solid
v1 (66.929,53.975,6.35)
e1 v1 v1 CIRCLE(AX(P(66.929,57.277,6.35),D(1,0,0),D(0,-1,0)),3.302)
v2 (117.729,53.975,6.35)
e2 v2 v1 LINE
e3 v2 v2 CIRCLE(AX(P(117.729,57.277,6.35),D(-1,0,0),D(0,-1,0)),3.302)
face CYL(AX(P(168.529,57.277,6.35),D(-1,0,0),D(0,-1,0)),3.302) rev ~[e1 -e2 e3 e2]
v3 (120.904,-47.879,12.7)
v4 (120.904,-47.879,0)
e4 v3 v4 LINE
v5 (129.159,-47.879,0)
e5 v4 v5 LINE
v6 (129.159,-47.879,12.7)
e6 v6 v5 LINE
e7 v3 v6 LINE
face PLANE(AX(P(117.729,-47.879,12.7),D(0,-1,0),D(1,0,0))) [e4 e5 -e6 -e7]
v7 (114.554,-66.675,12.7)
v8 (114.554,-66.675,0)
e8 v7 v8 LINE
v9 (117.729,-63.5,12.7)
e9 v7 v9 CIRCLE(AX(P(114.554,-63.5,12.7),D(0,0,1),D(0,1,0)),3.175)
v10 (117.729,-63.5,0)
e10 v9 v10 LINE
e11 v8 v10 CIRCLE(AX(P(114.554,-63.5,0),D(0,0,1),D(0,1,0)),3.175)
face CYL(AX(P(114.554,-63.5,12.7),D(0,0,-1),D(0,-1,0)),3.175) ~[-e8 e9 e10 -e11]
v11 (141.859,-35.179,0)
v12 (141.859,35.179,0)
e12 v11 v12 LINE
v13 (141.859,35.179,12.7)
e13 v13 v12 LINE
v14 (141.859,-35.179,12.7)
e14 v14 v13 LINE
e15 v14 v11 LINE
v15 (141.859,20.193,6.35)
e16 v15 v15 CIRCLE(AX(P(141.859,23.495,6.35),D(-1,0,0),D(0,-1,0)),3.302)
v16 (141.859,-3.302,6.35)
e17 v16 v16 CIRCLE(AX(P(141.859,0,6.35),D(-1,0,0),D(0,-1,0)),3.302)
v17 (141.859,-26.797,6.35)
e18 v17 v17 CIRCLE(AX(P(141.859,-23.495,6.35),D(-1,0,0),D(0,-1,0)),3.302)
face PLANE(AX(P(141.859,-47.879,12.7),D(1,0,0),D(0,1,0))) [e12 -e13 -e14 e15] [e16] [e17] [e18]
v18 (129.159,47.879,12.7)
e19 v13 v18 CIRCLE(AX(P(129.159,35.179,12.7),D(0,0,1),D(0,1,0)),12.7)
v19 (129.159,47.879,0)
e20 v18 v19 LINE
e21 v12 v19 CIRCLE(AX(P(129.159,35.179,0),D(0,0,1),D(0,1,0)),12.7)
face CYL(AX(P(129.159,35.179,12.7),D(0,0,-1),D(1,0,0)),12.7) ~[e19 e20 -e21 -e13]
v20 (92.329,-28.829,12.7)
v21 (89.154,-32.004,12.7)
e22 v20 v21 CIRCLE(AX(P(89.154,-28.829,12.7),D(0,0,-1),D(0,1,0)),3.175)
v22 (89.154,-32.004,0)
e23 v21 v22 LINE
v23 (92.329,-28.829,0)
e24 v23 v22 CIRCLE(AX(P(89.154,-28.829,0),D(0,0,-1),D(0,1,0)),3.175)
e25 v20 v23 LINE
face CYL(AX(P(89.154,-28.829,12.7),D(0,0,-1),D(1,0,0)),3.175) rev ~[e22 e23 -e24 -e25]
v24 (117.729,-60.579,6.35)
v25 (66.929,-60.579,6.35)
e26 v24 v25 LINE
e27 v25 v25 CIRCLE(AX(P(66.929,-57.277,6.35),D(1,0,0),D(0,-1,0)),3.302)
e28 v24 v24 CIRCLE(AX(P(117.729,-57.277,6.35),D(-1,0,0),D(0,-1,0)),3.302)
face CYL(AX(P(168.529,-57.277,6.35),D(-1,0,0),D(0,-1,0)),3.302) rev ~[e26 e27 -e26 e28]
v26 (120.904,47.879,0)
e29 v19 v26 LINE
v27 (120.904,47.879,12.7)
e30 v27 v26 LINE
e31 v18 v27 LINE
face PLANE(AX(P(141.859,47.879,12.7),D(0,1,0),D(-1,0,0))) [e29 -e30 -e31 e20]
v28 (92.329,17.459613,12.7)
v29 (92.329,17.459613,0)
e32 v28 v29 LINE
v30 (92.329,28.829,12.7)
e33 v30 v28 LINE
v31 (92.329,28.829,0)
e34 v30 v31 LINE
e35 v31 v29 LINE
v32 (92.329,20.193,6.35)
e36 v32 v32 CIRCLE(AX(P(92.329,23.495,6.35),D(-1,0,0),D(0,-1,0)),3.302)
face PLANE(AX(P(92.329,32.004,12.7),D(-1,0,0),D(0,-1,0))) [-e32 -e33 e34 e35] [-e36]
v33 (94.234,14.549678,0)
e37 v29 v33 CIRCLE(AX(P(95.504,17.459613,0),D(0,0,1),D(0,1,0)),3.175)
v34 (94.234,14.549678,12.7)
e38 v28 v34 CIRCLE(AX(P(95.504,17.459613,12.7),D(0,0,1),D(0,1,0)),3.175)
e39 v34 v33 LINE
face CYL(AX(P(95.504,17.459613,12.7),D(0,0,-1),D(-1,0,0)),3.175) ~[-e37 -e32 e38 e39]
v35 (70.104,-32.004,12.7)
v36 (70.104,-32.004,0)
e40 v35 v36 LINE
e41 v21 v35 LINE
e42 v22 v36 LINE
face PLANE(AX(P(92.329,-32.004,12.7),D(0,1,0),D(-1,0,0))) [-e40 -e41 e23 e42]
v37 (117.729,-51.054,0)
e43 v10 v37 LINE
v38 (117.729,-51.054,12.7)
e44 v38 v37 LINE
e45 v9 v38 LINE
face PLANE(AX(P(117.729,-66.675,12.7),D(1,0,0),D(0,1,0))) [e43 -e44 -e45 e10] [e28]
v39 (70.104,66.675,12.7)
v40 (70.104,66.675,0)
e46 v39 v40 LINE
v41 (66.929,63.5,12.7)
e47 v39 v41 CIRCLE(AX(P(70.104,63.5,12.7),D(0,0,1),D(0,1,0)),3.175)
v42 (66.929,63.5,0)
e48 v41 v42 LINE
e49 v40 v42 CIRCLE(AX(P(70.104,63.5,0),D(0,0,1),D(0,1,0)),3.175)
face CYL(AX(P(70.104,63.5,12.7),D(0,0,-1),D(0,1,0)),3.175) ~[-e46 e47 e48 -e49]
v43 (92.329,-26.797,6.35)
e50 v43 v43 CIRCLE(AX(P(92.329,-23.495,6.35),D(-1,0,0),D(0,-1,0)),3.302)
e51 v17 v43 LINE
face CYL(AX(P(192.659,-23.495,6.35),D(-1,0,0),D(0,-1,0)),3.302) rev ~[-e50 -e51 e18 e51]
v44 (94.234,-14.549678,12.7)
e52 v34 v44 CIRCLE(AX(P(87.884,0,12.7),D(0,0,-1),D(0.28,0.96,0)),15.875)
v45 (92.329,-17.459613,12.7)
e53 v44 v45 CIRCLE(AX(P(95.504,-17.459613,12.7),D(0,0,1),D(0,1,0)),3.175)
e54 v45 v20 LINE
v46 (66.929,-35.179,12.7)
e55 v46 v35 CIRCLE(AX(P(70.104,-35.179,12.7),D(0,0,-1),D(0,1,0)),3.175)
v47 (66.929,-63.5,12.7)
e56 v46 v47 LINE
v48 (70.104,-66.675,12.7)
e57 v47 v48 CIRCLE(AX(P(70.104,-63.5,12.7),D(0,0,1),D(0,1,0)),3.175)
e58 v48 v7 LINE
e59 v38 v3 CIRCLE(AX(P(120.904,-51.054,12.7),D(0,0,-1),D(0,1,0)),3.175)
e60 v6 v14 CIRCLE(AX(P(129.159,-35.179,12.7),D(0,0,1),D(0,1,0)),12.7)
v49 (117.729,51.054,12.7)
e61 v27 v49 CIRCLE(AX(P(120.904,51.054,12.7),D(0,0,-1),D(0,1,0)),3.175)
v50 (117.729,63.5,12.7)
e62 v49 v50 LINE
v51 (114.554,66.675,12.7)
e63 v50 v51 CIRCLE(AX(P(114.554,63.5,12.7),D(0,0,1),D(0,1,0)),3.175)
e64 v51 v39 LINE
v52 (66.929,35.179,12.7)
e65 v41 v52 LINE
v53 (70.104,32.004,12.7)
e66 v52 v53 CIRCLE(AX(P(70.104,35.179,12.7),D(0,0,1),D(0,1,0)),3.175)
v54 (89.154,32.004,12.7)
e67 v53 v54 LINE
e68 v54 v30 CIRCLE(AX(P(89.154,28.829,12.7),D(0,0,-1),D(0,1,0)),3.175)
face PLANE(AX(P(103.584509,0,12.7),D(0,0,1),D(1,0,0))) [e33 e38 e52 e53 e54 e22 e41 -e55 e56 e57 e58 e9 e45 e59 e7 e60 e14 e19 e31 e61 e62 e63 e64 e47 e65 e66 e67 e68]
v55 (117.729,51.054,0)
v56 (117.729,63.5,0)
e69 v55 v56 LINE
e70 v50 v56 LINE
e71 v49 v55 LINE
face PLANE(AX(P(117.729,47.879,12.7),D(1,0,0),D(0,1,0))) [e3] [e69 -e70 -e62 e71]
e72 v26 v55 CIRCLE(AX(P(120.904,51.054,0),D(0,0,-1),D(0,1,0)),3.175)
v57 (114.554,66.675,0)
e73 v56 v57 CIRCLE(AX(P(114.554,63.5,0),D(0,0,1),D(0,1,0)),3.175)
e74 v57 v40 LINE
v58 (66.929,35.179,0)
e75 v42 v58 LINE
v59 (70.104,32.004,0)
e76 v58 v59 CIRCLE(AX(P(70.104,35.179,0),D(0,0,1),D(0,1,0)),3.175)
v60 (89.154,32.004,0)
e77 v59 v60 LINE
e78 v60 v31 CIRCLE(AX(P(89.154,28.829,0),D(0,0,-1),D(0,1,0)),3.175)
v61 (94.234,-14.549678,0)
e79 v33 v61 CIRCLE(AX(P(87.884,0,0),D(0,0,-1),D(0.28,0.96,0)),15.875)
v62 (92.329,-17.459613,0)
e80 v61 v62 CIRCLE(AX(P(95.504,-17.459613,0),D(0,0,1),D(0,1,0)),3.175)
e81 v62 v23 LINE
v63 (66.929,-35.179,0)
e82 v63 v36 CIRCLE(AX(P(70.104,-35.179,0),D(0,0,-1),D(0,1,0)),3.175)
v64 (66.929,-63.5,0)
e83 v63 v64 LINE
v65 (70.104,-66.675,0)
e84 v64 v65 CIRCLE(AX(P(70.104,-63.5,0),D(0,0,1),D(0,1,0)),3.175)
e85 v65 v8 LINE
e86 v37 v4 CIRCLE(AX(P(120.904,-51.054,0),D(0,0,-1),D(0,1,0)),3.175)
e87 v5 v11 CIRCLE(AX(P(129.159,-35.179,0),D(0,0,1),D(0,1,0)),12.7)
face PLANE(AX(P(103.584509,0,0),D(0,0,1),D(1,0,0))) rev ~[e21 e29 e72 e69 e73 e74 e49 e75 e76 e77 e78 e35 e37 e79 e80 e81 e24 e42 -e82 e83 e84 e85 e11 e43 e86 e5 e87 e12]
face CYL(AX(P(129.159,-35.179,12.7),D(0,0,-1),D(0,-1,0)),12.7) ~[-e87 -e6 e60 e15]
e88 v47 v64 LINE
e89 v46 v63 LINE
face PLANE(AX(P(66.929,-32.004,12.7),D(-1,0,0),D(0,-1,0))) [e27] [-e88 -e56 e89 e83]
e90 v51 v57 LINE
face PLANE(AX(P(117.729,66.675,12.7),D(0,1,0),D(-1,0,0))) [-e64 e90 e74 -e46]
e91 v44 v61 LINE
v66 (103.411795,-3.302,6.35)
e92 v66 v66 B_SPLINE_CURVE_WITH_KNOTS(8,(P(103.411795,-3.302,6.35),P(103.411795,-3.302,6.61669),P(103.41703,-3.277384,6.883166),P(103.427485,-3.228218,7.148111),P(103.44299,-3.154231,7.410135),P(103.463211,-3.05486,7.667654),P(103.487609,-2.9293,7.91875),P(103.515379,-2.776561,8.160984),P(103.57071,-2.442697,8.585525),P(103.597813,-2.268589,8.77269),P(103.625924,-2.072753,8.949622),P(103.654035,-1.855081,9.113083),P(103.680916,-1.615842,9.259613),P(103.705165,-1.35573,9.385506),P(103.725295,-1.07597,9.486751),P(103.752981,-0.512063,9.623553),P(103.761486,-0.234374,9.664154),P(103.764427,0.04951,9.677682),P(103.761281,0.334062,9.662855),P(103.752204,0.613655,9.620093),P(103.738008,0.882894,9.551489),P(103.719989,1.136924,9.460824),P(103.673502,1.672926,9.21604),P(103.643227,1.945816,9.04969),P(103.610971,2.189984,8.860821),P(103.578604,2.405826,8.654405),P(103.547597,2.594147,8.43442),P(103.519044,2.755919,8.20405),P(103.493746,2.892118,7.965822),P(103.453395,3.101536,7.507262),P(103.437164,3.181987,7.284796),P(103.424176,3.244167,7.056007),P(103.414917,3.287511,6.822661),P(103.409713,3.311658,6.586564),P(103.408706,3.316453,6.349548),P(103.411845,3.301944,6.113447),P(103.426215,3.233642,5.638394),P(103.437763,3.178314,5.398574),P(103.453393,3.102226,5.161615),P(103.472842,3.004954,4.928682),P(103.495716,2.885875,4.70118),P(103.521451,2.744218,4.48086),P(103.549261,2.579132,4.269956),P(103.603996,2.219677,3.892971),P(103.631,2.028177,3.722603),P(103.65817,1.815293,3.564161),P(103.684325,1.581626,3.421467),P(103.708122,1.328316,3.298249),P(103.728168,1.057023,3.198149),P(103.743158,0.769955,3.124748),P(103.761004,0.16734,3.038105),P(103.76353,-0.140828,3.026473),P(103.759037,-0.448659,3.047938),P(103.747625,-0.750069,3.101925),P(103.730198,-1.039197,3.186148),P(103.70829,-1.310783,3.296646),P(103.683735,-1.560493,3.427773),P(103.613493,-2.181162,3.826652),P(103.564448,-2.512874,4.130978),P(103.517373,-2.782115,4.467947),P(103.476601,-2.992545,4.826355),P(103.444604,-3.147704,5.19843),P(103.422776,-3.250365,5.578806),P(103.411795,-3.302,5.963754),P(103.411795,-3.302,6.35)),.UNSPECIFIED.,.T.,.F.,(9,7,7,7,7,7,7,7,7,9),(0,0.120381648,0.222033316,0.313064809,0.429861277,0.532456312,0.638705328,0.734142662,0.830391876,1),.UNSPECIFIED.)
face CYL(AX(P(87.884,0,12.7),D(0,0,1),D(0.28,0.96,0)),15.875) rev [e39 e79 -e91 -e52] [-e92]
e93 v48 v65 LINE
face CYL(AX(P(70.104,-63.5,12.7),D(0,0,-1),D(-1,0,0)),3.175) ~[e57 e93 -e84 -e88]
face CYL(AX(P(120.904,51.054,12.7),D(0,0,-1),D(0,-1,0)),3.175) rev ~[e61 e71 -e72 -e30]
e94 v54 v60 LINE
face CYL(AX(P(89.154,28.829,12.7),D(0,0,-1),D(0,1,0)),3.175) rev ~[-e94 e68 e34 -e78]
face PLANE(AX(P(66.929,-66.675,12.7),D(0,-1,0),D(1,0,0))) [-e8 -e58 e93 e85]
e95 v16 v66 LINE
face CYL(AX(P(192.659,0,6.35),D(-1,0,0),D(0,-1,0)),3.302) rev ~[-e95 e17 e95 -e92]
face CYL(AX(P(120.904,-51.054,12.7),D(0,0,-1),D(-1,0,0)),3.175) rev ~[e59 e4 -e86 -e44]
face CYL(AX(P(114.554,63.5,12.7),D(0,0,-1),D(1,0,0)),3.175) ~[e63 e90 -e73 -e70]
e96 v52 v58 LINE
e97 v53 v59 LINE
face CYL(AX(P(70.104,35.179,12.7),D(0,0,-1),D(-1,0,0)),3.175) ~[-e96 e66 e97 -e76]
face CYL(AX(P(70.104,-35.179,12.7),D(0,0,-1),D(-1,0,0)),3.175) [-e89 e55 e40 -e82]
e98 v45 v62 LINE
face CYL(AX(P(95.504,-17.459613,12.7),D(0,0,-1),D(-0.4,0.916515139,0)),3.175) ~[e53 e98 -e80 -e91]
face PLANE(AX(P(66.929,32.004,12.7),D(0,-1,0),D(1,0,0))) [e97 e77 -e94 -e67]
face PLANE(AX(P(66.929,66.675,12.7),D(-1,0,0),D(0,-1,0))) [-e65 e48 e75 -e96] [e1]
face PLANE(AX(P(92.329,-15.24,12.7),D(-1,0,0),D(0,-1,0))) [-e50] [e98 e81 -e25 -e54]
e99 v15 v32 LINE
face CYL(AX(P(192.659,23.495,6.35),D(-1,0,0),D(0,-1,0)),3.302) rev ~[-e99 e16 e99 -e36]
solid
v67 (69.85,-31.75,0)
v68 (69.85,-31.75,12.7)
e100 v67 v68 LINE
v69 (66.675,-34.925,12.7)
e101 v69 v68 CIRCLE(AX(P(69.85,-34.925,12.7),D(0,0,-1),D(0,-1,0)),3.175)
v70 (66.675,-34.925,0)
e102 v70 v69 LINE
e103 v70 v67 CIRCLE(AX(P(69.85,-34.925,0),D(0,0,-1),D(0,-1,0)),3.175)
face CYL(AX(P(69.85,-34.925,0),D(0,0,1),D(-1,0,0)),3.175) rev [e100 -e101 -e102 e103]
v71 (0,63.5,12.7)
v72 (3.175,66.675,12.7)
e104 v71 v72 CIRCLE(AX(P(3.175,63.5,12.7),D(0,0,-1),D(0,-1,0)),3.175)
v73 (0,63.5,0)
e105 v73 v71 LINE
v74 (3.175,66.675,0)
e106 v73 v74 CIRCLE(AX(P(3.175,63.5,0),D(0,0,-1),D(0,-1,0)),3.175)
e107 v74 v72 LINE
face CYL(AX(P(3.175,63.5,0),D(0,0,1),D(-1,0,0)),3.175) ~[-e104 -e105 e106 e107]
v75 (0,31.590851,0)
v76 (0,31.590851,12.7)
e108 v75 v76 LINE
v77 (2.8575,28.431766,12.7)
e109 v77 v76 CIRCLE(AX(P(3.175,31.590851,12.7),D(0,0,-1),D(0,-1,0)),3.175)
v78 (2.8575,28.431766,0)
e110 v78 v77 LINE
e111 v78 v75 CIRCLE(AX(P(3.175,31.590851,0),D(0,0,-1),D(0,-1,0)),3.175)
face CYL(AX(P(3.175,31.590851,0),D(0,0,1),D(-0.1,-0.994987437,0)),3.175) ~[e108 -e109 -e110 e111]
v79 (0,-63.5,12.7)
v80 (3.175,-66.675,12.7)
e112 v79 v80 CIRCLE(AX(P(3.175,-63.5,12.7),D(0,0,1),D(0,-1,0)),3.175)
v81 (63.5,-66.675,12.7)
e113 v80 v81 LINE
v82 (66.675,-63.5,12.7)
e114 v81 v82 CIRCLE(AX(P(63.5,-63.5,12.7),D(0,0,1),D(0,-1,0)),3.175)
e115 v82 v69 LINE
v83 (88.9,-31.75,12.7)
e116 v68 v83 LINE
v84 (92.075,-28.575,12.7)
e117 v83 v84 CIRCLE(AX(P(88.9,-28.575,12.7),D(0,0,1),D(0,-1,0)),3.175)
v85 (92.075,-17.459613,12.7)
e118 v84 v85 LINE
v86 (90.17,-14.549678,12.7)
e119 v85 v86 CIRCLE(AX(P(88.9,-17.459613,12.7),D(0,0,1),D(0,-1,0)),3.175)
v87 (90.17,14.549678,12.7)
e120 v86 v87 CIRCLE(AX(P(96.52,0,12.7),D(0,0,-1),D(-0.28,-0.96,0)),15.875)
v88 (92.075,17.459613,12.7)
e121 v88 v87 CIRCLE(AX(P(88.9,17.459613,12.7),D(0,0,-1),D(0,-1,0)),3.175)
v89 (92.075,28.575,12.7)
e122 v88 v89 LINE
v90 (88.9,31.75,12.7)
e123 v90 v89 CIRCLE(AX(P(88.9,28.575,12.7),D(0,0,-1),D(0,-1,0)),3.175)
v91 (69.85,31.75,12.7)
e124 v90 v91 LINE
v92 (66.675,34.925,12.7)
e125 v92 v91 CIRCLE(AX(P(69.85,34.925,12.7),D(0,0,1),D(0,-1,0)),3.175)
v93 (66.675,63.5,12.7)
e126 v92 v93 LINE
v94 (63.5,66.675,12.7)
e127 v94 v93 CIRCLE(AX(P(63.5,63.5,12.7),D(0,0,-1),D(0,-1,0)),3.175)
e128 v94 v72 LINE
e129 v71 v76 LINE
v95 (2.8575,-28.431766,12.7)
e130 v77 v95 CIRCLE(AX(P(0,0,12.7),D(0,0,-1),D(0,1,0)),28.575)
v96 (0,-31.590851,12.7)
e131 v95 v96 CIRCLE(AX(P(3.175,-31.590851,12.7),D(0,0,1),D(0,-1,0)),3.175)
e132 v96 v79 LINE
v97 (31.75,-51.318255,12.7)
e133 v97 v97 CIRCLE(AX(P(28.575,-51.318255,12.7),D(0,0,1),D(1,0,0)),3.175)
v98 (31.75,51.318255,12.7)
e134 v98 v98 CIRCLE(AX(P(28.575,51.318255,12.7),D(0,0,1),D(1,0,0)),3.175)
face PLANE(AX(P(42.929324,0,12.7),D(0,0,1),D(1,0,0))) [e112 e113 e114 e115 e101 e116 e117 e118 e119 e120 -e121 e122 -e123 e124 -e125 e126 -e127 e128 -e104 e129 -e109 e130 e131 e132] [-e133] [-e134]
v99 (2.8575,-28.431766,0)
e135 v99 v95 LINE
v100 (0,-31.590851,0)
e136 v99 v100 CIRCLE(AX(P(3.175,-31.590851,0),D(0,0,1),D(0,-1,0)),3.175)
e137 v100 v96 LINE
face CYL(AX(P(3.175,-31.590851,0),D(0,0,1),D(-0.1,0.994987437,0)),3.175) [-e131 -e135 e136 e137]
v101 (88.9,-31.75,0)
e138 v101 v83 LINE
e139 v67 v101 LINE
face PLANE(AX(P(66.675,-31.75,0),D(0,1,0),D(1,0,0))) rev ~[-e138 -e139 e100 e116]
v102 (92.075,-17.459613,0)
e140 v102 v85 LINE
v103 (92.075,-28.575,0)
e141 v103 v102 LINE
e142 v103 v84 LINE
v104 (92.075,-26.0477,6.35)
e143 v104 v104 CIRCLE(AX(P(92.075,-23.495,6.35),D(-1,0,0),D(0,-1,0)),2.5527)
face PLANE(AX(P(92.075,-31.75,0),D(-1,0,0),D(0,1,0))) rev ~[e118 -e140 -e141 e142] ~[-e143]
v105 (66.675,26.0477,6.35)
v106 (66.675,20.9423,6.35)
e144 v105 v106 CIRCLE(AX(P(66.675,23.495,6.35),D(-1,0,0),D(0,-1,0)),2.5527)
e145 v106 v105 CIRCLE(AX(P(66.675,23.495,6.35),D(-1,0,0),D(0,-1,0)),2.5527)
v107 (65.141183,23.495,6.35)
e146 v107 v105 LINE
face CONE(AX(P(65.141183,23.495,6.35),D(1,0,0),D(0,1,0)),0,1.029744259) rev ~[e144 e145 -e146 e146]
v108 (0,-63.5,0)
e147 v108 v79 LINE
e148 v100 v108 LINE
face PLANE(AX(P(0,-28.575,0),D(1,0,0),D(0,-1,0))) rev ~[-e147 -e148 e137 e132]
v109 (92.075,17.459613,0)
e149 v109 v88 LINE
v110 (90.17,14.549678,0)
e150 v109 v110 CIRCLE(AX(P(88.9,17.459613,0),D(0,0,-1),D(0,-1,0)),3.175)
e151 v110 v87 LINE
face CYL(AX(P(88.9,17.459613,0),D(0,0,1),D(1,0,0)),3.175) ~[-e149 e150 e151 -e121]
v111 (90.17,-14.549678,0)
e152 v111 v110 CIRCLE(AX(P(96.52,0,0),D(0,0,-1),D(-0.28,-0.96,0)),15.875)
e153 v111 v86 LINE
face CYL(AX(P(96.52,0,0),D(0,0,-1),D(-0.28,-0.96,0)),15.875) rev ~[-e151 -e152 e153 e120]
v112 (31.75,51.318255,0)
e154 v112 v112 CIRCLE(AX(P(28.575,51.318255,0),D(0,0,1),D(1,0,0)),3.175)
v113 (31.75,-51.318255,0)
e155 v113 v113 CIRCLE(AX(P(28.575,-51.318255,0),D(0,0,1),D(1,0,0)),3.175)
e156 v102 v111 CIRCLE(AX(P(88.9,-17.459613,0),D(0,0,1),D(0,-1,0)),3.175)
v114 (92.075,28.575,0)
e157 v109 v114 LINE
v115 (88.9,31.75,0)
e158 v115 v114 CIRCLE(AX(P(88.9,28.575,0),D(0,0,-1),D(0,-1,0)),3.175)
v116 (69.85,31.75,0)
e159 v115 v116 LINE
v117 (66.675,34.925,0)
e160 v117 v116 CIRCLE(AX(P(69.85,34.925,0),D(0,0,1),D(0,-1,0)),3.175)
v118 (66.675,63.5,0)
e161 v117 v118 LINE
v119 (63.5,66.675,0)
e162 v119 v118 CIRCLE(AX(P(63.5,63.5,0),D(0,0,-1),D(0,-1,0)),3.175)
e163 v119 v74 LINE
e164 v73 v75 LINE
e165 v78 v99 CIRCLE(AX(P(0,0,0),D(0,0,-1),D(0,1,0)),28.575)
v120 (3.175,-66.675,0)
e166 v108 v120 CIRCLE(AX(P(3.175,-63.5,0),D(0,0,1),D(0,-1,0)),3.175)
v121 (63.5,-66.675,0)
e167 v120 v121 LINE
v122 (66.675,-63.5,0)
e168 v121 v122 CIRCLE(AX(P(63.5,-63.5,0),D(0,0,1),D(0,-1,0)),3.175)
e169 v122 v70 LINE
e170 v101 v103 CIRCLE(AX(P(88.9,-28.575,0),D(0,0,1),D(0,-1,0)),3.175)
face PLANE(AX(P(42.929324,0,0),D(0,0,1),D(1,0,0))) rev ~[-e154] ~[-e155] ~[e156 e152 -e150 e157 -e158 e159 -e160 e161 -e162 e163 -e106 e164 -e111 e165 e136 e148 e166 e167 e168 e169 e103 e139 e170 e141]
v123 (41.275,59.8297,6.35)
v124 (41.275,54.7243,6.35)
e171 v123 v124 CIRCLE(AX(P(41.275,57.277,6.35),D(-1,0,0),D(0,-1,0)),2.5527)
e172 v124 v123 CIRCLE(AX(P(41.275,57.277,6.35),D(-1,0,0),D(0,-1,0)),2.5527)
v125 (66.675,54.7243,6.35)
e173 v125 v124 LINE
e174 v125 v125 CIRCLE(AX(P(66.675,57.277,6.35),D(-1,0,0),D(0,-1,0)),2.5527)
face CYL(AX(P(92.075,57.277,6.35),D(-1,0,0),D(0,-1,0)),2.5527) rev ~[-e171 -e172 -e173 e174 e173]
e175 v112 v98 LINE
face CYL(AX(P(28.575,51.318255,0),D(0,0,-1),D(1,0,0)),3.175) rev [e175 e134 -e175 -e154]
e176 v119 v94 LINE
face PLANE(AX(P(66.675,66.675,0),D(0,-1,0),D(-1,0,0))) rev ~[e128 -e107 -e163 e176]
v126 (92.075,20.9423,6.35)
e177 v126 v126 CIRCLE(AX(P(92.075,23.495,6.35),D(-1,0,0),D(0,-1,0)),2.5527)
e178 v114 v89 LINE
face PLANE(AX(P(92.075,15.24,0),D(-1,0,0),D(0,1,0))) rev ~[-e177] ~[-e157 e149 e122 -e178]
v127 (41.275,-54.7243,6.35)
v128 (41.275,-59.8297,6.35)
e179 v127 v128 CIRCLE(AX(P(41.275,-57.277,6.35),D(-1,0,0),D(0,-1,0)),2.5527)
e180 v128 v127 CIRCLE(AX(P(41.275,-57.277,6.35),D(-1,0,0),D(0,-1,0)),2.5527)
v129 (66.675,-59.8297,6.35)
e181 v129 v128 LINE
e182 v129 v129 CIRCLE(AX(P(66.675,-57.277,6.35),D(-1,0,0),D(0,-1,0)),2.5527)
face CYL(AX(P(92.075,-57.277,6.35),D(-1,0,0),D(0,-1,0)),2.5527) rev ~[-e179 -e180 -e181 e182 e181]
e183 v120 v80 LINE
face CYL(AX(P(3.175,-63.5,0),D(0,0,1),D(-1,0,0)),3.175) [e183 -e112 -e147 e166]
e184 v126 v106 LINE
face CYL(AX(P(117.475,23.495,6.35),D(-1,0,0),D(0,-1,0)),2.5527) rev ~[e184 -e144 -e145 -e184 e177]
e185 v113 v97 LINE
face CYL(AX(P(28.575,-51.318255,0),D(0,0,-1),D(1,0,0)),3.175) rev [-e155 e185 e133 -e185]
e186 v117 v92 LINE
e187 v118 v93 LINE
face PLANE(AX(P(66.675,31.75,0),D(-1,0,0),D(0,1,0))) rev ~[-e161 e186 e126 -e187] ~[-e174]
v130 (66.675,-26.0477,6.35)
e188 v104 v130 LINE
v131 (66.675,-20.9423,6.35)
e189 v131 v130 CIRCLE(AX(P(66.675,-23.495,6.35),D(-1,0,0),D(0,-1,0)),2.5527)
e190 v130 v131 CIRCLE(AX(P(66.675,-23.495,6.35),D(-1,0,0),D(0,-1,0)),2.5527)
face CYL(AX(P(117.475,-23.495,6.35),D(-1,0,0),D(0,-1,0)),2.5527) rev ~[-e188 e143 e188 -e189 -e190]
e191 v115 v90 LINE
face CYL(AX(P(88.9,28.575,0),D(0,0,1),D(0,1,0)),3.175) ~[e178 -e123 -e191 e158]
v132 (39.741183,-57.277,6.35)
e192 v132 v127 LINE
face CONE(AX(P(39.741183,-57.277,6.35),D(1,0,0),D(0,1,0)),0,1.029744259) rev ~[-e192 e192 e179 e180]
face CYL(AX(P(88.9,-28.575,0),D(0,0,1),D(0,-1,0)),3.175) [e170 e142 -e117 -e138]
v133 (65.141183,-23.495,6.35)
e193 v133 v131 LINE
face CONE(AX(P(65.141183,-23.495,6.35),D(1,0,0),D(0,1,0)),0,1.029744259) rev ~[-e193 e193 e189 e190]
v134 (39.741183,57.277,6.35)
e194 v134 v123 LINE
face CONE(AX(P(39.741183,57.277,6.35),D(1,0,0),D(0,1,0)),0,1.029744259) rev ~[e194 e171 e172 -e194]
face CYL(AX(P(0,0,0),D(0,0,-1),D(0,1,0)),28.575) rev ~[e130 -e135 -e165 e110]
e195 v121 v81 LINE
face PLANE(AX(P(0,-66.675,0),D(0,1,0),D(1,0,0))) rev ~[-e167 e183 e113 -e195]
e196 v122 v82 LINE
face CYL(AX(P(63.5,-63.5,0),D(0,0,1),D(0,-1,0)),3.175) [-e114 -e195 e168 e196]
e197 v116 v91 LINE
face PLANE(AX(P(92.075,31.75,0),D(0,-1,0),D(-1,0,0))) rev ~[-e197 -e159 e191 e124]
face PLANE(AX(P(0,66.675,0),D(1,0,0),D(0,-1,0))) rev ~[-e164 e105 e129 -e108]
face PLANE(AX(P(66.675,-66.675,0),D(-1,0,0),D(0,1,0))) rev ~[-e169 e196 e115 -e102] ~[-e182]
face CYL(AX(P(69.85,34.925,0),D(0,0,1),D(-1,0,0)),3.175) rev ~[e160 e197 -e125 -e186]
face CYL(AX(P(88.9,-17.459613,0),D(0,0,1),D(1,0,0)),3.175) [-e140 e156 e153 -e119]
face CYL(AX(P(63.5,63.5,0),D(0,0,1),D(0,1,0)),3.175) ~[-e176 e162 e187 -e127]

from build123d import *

# Parameters (mm, degrees)
F0_R      = 6.35
F1_DEPTH  = 47.625
F3_DEPTH  = 31.75
F4_R      = 23.8125
F4_R_2    = 18.7325
F5_DEPTH  = 20.32
F6_R      = 6.35
F6_R_2    = 2.2225
F7_DEPTH  = 14.605
F8_R      = 54.5973
F8_R_2    = 6.35
F9_DEPTH  = 118.491
F10_R     = 54.61
F10_R_2   = 54.5973
F10_R_3   = 6.35
F11_DEPTH = 57.15
F13_DEPTH = 101.6
F15_DEPTH = 25.4
F16_DEPTH = 76.2
F18_DEPTH = 76.2
F20_D     = 12.7
F20_DEPTH = 12.7
F20_TIP   = 3.8154649308
F22_D     = 12.7
F22_2_D   = 12.7
F23_R     = 5.08
F23_2_R   = 5.08
F26_R     = 6.35
F27_R     = 3.175
F28_DEPTH = 12.7
F33_DEPTH = 12.7
F34_R     = 3.175
F35_R     = 3.175
F36_R     = 12.7
F38_D     = 6.604
F38_DEPTH = 50.8
F38_TIP   = 1.984041764
F40_D     = 6.604
F40_DEPTH = 50.8
F40_TIP   = 1.984041764
F42_D     = 6.604
F42_DEPTH = 50.8
F42_TIP   = 1.984041764
F44_D     = 5.1054
F44_DEPTH = 25.4
F44_TIP   = 1.5338169022
F46_D     = 5.1054
F46_DEPTH = 25.4
F46_TIP   = 1.5338169022
F48_D     = 5.1054
F48_DEPTH = 25.4
F48_TIP   = 1.5338169022


# Not quite as in the source:
# - a feature names something its author has since deleted; it is built from what else it names


with BuildPart() as f1:
    # F0 (on Top) → F1 (new body)
    with BuildSketch(Plane.XY):
        Circle(F0_R)
    extrude(amount=-F1_DEPTH)

    # F2 (on face) → F3 (cut)
    with BuildSketch(Plane.XY):
        with BuildLine():
            Line((-3.4925, 5.3032955556), (3.4925, 5.3032955556))
            ThreePointArc((3.4925, 5.3032955556), (0, 6.35), (-3.4925, 5.3032955556))
        make_face()
    extrude(amount=-F3_DEPTH, mode=Mode.SUBTRACT)


with BuildPart() as f5:
    # F4 (on face) → F5 (new body)
    with BuildSketch(Plane(origin=(0, 0, -47.625), x_dir=(1, 0, 0), z_dir=(0, 0, -1))):
        Circle(F4_R)
        Circle(F4_R_2, mode=Mode.SUBTRACT)
    extrude(amount=-F5_DEPTH)


with BuildPart() as f7:
    # F6 (on face) → F7 (new body)
    with BuildSketch(Plane(origin=(0, 0, -47.625), x_dir=(1, 0, 0), z_dir=(0, 0, -1))):
        with BuildLine():
            ThreePointArc((30.5321277528, -45.2773814933), (48.216239985, -25.640715702), (54.61, 0))
            ThreePointArc((54.61, 0), (48.216239985, 25.640715702), (30.5321277528, 45.2773814933))
            ThreePointArc((30.5321277528, 45.2773814933), (26.567027027, 47.7121072155), (22.4090607059, 49.800462832))
            ThreePointArc((22.4090607059, 49.800462832), (0, 54.61), (-22.4090607059, 49.800462832))
            ThreePointArc((-22.4090607059, 49.800462832), (-26.567027027, 47.7121072155), (-30.5321277528, 45.2773814933))
            ThreePointArc((-30.5321277528, 45.2773814933), (-54.61, 0), (-30.5321277528, -45.2773814933))
            ThreePointArc((-30.5321277528, -45.2773814933), (-26.567027027, -47.7121072155), (-22.4090607059, -49.800462832))
            ThreePointArc((-22.4090607059, -49.800462832), (0, -54.61), (22.4090607059, -49.800462832))
            ThreePointArc((22.4090607059, -49.800462832), (26.567027027, -47.7121072155), (30.5321277528, -45.2773814933))
        make_face()
        Circle(F6_R, mode=Mode.SUBTRACT)
        with BuildLine():
            ThreePointArc((-30.5321277528, -45.2773814933), (-31.6641891892, -56.8661742976), (-22.4090607059, -49.800462832))
            ThreePointArc((-22.4090607059, -49.800462832), (-26.567027027, -47.7121072155), (-30.5321277528, -45.2773814933))
        make_face()
        with Locations((-28.575, -51.3182548539)):
            Circle(F6_R_2, mode=Mode.SUBTRACT)
        with BuildLine():
            ThreePointArc((22.4090607059, -49.800462832), (31.6641891892, -56.8661742976), (30.5321277528, -45.2773814933))
            ThreePointArc((30.5321277528, -45.2773814933), (26.567027027, -47.7121072155), (22.4090607059, -49.800462832))
        make_face()
        with Locations((28.575, -51.3182548539)):
            Circle(F6_R_2, mode=Mode.SUBTRACT)
        with BuildLine():
            ThreePointArc((22.4090607059, 49.800462832), (26.567027027, 47.7121072155), (30.5321277528, 45.2773814933))
            ThreePointArc((30.5321277528, 45.2773814933), (31.6641891892, 56.8661742976), (22.4090607059, 49.800462832))
        make_face()
        with Locations((28.575, 51.3182548539)):
            Circle(F6_R_2, mode=Mode.SUBTRACT)
        with BuildLine():
            ThreePointArc((-30.5321277528, 45.2773814933), (-26.567027027, 47.7121072155), (-22.4090607059, 49.800462832))
            ThreePointArc((-22.4090607059, 49.800462832), (-31.6641891892, 56.8661742976), (-30.5321277528, 45.2773814933))
        make_face()
        with Locations((-28.575, 51.3182548539)):
            Circle(F6_R_2, mode=Mode.SUBTRACT)
    extrude(amount=F7_DEPTH)

    # F8 (on face) → F9 (join)
    with BuildSketch(Plane(origin=(0, 0, -62.23), x_dir=(1, 0, 0), z_dir=(0, 0, -1))):
        Circle(F8_R)
        Circle(F8_R_2, mode=Mode.SUBTRACT)
    extrude(amount=F9_DEPTH)

    # F10 (on face) → F11 (join)
    with BuildSketch(Plane(origin=(0, 0, -180.721), x_dir=(1, 0, 0), z_dir=(0, 0, -1))):
        Circle(F10_R)
        Circle(F10_R_2, mode=Mode.SUBTRACT)
        Circle(F10_R_2)
        Circle(F10_R_3, mode=Mode.SUBTRACT)
    extrude(amount=F11_DEPTH)

    # F26
    f26_edges = [f7.edges().sort_by_distance(p)[0] for p in [
        (-22.409061, -49.800463, -54.9275),
        (30.532128, -45.277381, -54.9275),
        (22.409061, 49.800463, -54.9275),
        (-30.532128, 45.277381, -54.9275),
    ]]
    fillet(f26_edges, radius=F26_R)


with BuildPart() as f13:
    # F12 (on face) → F13 (new body)
    with BuildSketch(Plane.XY.offset(-47.625)):
        with BuildLine():
            Line((-82.55, 31.7245898319), (-44.45, 31.7245898319))
            ThreePointArc((-44.45, 31.7245898319), (-38.0985486737, 39.1248346829), (-30.5321277528, 45.2773814933))
            ThreePointArc((-30.5321277528, 45.2773814933), (-31.6641891892, 56.8661742976), (-22.4090607059, 49.800462832))
            ThreePointArc((-22.4090607059, 49.800462832), (-11.4596863994, 53.3940791439), (0, 54.61))
            Line((0, 54.61), (0, 67.31))
            ThreePointArc((0, 67.31), (-26.9947671741, 61.30558596), (-48.8991597124, 44.4245898319))
            Line((-48.8991597124, 44.4245898319), (-82.55, 44.4245898319))
            Line((-82.55, 44.4245898319), (-82.55, 31.7245898319))
        make_face()
        with BuildLine():
            ThreePointArc((30.5321277528, 45.2773814933), (38.0985486737, 39.1248346829), (44.45, 31.7245898319))
            Line((44.45, 31.7245898319), (82.55, 31.7245898319))
            Line((82.55, 31.7245898319), (82.55, 44.4245898319))
            Line((82.55, 44.4245898319), (48.8991597124, 44.4245898319))
            ThreePointArc((48.8991597124, 44.4245898319), (26.9947671741, 61.30558596), (0, 67.31))
            Line((0, 67.31), (0, 54.61))
            ThreePointArc((0, 54.61), (11.4596863994, 53.3940791439), (22.4090607059, 49.800462832))
            ThreePointArc((22.4090607059, 49.800462832), (31.6641891892, 56.8661742976), (30.5321277528, 45.2773814933))
        make_face()
    extrude(amount=-F13_DEPTH)

    # F22 (through all)
    with Locations(Plane.XZ.offset(44.4245898319)):
        with Locations((-69.85, -60.325), (-69.85, -98.425), (-69.85, -136.525), (69.85, -60.325), (69.85, -98.425), (69.85, -136.525)):
            Hole(F22_D / 2)

    # F23
    f23_edges = [f13.edges().sort_by_distance(p)[0] for p in [
        (-48.89916, 44.42459, -98.425),
        (48.89916, 44.42459, -98.425),
    ]]
    fillet(f23_edges, radius=F23_R)


with BuildPart() as f15:
    # F14 (on face) → F15 (new body)
    with BuildSketch(Plane.XY.offset(-47.625)):
        with BuildLine():
            Line((82.55, -31.7245898319), (44.45, -31.7245898319))
            ThreePointArc((44.45, -31.7245898319), (38.0985486737, -39.1248346829), (30.5321277528, -45.2773814933))
            ThreePointArc((30.5321277528, -45.2773814933), (31.6641891892, -56.8661742976), (22.4090607059, -49.800462832))
            ThreePointArc((22.4090607059, -49.800462832), (11.4596863994, -53.3940791439), (0, -54.61))
            Line((0, -54.61), (0, -67.31))
            ThreePointArc((0, -67.31), (26.9947671741, -61.30558596), (48.8991597124, -44.4245898319))
            Line((48.8991597124, -44.4245898319), (82.55, -44.4245898319))
            Line((82.55, -44.4245898319), (82.55, -31.7245898319))
        make_face()
        with BuildLine():
            ThreePointArc((-30.5321277528, -45.2773814933), (-38.0985486737, -39.1248346829), (-44.45, -31.7245898319))
            Line((-44.45, -31.7245898319), (-82.55, -31.7245898319))
            Line((-82.55, -31.7245898319), (-82.55, -44.4245898319))
            Line((-82.55, -44.4245898319), (-48.8991597124, -44.4245898319))
            ThreePointArc((-48.8991597124, -44.4245898319), (-26.9947671741, -61.30558596), (0, -67.31))
            Line((0, -67.31), (0, -54.61))
            ThreePointArc((0, -54.61), (-11.4596863994, -53.3940791439), (-22.4090607059, -49.800462832))
            ThreePointArc((-22.4090607059, -49.800462832), (-31.6641891892, -56.8661742976), (-30.5321277528, -45.2773814933))
        make_face()
    extrude(amount=-F15_DEPTH)

    # F16 (add): faces of the model
    f16_faces = [f15.faces().sort_by_distance(p)[0] for p in [
        (80.8610852178, -38.0745898319, -73.025),
        (80.8610852178, -38.0745898319, -73.025),
    ]]
    extrude(f16_faces, amount=F16_DEPTH)

    # F17 (on face) → F18 (join)
    with BuildSketch(Plane(origin=(0, 0, -149.225), x_dir=(1, 0, 0), z_dir=(0, 0, -1))):
        with BuildLine():
            Line((-38.1, 87.6758182624), (-38.1, 54.6558182624))
            ThreePointArc((-38.1, 54.6558182624), (0, 67.31), (38.1, 54.6558182624))
            Line((38.1, 54.6558182624), (38.1, 87.6758182624))
            Line((38.1, 87.6758182624), (12.7, 87.6758182624))
            ThreePointArc((12.7, 87.6758182624), (0, 76.2), (-12.7, 87.6758182624))
            Line((-12.7, 87.6758182624), (-38.1, 87.6758182624))
        make_face()
    extrude(amount=-F18_DEPTH)

    # F20
    with Locations(Plane.XZ.offset(87.6758182624)):
        with Locations((-25.4, -85.725), (25.1709398942, -85.725), (-25.4, -111.125), (24.5334483168, -111.125), (-25.4, -136.525), (25.347779546, -136.525)):
            Hole(F20_D / 2, depth=F20_DEPTH)
            with Locations((0, 0, -(F20_DEPTH + F20_TIP / 2))):  # 118° drill point
                Cone(0, F20_D / 2, F20_TIP, mode=Mode.SUBTRACT)

    # F22#2 (through all)
    with Locations(Plane.XZ.offset(44.4245898319)):
        with Locations((-69.85, -60.325), (-69.85, -98.425), (-69.85, -136.525), (69.85, -60.325), (69.85, -98.425), (69.85, -136.525)):
            Hole(F22_2_D / 2)

    # F23#2
    f23_2_edges = [f15.edges().sort_by_distance(p)[0] for p in [
        (-38.1, -54.655818, -111.125),
        (0, -67.31, -73.025),
        (38.1, -54.655818, -111.125),
        (48.89916, -44.42459, -98.425),
        (-48.89916, -44.42459, -98.425),
    ]]
    fillet(f23_2_edges, radius=F23_2_R)


with BuildPart() as f28:
    # F27 (on Top) → F28 (new body)
    with BuildSketch(Plane.XY):
        with BuildLine():
            ThreePointArc((0, 28.575), (28.575, 0), (0, -28.575))
            Line((0, -28.575), (0, -66.675))
            Line((0, -66.675), (66.675, -66.675))
            Line((66.675, -66.675), (66.675, -31.75))
            Line((66.675, -31.75), (92.075, -31.75))
            Line((92.075, -31.75), (92.075, -15.24))
            ThreePointArc((92.075, -15.24), (80.645, 0), (92.075, 15.24))
            Line((92.075, 15.24), (92.075, 31.75))
            Line((92.075, 31.75), (66.675, 31.75))
            Line((66.675, 31.75), (66.675, 66.675))
            Line((66.675, 66.675), (0, 66.675))
            Line((0, 66.675), (0, 28.575))
        make_face()
        with Locations((28.575, -51.3182548539)):
            Circle(F27_R, mode=Mode.SUBTRACT)
        with Locations((28.575, 51.3182548539)):
            Circle(F27_R, mode=Mode.SUBTRACT)
    extrude(amount=F28_DEPTH)

    # F34
    f34_edges = [f28.edges().sort_by_distance(p)[0] for p in [
        (92.075, -31.75, 6.35),
        (66.675, -31.75, 6.35),
        (66.675, -66.675, 6.35),
        (92.075, -15.24, 6.35),
        (92.075, 15.24, 6.35),
        (92.075, 31.75, 6.35),
        (66.675, 31.75, 6.35),
        (66.675, 66.675, 6.35),
        (0, -66.675, 6.35),
        (0, -28.575, 6.35),
        (0, 28.575, 6.35),
        (0, 66.675, 6.35),
    ]]
    fillet(f34_edges, radius=F34_R)

    # F44
    with Locations(Plane.YZ.offset(66.675)):
        with Locations((-57.277, 6.35)):
            Hole(F44_D / 2, depth=F44_DEPTH)
            with Locations((0, 0, -(F44_DEPTH + F44_TIP / 2))):  # 118° drill point
                Cone(0, F44_D / 2, F44_TIP, mode=Mode.SUBTRACT)

    # F46
    with Locations(Plane.YZ.offset(66.675)):
        with Locations((57.277, 6.35)):
            Hole(F46_D / 2, depth=F46_DEPTH)
            with Locations((0, 0, -(F46_DEPTH + F46_TIP / 2))):  # 118° drill point
                Cone(0, F46_D / 2, F46_TIP, mode=Mode.SUBTRACT)

    # F48
    with Locations(Plane.YZ.offset(92.075)):
        with Locations((-23.495, 6.35), (23.495, 6.35)):
            Hole(F48_D / 2, depth=F48_DEPTH)
            with Locations((0, 0, -(F48_DEPTH + F48_TIP / 2))):  # 118° drill point
                Cone(0, F48_D / 2, F48_TIP, mode=Mode.SUBTRACT)


with BuildPart() as f33:
    # F32 (on face) → F33 (new body)
    with BuildSketch(Plane.XY.offset(12.7)):
        with BuildLine():
            Line((66.929, -32.004), (66.929, -66.675))
            Line((66.929, -66.675), (117.729, -66.675))
            Line((117.729, -66.675), (117.729, -47.879))
            Line((117.729, -47.879), (141.859, -47.879))
            Line((141.859, -47.879), (141.859, 0))
            Line((141.859, 0), (141.859, 47.879))
            Line((141.859, 47.879), (117.729, 47.879))
            Line((117.729, 47.879), (117.729, 66.675))
            Line((117.729, 66.675), (66.929, 66.675))
            Line((66.929, 66.675), (66.929, 32.004))
            Line((66.929, 32.004), (92.329, 32.004))
            Line((92.329, 32.004), (92.329, 15.24))
            ThreePointArc((92.329, 15.24), (103.759, 0), (92.329, -15.24))
            Line((92.329, -15.24), (92.329, -32.004))
            Line((92.329, -32.004), (66.929, -32.004))
        make_face()
    extrude(amount=-F33_DEPTH)

    # F35
    f35_edges = [f33.edges().sort_by_distance(p)[0] for p in [
        (66.929, 32.004, 6.35),
        (92.329, 32.004, 6.35),
        (92.329, 15.24, 6.35),
        (92.329, -15.24, 6.35),
        (92.329, -32.004, 6.35),
        (66.929, -32.004, 6.35),
        (117.729, -66.675, 6.35),
        (117.729, -47.879, 6.35),
        (117.729, 66.675, 6.35),
        (117.729, 47.879, 6.35),
        (66.929, -66.675, 6.35),
        (66.929, 66.675, 6.35),
    ]]
    fillet(f35_edges, radius=F35_R)

    # F36
    f36_edges = [f33.edges().sort_by_distance(p)[0] for p in [
        (141.859, 47.879, 6.35),
        (141.859, -47.879, 6.35),
    ]]
    fillet(f36_edges, radius=F36_R)

    # F38
    with Locations(Plane.YZ.offset(117.729)):
        with Locations((-57.277, 6.35)):
            Hole(F38_D / 2, depth=F38_DEPTH)
            with Locations((0, 0, -(F38_DEPTH + F38_TIP / 2))):  # 118° drill point
                Cone(0, F38_D / 2, F38_TIP, mode=Mode.SUBTRACT)

    # F40
    with Locations(Plane.YZ.offset(117.729)):
        with Locations((57.277, 6.35)):
            Hole(F40_D / 2, depth=F40_DEPTH)
            with Locations((0, 0, -(F40_DEPTH + F40_TIP / 2))):  # 118° drill point
                Cone(0, F40_D / 2, F40_TIP, mode=Mode.SUBTRACT)

    # F42
    with Locations(Plane.YZ.offset(141.859)):
        with Locations((-23.495, 6.35), (23.495, 6.35), (0, 6.35)):
            Hole(F42_D / 2, depth=F42_DEPTH)
            with Locations((0, 0, -(F42_DEPTH + F42_TIP / 2))):  # 118° drill point
                Cone(0, F42_D / 2, F42_TIP, mode=Mode.SUBTRACT)


solid = Compound([f28.part, f33.part])
